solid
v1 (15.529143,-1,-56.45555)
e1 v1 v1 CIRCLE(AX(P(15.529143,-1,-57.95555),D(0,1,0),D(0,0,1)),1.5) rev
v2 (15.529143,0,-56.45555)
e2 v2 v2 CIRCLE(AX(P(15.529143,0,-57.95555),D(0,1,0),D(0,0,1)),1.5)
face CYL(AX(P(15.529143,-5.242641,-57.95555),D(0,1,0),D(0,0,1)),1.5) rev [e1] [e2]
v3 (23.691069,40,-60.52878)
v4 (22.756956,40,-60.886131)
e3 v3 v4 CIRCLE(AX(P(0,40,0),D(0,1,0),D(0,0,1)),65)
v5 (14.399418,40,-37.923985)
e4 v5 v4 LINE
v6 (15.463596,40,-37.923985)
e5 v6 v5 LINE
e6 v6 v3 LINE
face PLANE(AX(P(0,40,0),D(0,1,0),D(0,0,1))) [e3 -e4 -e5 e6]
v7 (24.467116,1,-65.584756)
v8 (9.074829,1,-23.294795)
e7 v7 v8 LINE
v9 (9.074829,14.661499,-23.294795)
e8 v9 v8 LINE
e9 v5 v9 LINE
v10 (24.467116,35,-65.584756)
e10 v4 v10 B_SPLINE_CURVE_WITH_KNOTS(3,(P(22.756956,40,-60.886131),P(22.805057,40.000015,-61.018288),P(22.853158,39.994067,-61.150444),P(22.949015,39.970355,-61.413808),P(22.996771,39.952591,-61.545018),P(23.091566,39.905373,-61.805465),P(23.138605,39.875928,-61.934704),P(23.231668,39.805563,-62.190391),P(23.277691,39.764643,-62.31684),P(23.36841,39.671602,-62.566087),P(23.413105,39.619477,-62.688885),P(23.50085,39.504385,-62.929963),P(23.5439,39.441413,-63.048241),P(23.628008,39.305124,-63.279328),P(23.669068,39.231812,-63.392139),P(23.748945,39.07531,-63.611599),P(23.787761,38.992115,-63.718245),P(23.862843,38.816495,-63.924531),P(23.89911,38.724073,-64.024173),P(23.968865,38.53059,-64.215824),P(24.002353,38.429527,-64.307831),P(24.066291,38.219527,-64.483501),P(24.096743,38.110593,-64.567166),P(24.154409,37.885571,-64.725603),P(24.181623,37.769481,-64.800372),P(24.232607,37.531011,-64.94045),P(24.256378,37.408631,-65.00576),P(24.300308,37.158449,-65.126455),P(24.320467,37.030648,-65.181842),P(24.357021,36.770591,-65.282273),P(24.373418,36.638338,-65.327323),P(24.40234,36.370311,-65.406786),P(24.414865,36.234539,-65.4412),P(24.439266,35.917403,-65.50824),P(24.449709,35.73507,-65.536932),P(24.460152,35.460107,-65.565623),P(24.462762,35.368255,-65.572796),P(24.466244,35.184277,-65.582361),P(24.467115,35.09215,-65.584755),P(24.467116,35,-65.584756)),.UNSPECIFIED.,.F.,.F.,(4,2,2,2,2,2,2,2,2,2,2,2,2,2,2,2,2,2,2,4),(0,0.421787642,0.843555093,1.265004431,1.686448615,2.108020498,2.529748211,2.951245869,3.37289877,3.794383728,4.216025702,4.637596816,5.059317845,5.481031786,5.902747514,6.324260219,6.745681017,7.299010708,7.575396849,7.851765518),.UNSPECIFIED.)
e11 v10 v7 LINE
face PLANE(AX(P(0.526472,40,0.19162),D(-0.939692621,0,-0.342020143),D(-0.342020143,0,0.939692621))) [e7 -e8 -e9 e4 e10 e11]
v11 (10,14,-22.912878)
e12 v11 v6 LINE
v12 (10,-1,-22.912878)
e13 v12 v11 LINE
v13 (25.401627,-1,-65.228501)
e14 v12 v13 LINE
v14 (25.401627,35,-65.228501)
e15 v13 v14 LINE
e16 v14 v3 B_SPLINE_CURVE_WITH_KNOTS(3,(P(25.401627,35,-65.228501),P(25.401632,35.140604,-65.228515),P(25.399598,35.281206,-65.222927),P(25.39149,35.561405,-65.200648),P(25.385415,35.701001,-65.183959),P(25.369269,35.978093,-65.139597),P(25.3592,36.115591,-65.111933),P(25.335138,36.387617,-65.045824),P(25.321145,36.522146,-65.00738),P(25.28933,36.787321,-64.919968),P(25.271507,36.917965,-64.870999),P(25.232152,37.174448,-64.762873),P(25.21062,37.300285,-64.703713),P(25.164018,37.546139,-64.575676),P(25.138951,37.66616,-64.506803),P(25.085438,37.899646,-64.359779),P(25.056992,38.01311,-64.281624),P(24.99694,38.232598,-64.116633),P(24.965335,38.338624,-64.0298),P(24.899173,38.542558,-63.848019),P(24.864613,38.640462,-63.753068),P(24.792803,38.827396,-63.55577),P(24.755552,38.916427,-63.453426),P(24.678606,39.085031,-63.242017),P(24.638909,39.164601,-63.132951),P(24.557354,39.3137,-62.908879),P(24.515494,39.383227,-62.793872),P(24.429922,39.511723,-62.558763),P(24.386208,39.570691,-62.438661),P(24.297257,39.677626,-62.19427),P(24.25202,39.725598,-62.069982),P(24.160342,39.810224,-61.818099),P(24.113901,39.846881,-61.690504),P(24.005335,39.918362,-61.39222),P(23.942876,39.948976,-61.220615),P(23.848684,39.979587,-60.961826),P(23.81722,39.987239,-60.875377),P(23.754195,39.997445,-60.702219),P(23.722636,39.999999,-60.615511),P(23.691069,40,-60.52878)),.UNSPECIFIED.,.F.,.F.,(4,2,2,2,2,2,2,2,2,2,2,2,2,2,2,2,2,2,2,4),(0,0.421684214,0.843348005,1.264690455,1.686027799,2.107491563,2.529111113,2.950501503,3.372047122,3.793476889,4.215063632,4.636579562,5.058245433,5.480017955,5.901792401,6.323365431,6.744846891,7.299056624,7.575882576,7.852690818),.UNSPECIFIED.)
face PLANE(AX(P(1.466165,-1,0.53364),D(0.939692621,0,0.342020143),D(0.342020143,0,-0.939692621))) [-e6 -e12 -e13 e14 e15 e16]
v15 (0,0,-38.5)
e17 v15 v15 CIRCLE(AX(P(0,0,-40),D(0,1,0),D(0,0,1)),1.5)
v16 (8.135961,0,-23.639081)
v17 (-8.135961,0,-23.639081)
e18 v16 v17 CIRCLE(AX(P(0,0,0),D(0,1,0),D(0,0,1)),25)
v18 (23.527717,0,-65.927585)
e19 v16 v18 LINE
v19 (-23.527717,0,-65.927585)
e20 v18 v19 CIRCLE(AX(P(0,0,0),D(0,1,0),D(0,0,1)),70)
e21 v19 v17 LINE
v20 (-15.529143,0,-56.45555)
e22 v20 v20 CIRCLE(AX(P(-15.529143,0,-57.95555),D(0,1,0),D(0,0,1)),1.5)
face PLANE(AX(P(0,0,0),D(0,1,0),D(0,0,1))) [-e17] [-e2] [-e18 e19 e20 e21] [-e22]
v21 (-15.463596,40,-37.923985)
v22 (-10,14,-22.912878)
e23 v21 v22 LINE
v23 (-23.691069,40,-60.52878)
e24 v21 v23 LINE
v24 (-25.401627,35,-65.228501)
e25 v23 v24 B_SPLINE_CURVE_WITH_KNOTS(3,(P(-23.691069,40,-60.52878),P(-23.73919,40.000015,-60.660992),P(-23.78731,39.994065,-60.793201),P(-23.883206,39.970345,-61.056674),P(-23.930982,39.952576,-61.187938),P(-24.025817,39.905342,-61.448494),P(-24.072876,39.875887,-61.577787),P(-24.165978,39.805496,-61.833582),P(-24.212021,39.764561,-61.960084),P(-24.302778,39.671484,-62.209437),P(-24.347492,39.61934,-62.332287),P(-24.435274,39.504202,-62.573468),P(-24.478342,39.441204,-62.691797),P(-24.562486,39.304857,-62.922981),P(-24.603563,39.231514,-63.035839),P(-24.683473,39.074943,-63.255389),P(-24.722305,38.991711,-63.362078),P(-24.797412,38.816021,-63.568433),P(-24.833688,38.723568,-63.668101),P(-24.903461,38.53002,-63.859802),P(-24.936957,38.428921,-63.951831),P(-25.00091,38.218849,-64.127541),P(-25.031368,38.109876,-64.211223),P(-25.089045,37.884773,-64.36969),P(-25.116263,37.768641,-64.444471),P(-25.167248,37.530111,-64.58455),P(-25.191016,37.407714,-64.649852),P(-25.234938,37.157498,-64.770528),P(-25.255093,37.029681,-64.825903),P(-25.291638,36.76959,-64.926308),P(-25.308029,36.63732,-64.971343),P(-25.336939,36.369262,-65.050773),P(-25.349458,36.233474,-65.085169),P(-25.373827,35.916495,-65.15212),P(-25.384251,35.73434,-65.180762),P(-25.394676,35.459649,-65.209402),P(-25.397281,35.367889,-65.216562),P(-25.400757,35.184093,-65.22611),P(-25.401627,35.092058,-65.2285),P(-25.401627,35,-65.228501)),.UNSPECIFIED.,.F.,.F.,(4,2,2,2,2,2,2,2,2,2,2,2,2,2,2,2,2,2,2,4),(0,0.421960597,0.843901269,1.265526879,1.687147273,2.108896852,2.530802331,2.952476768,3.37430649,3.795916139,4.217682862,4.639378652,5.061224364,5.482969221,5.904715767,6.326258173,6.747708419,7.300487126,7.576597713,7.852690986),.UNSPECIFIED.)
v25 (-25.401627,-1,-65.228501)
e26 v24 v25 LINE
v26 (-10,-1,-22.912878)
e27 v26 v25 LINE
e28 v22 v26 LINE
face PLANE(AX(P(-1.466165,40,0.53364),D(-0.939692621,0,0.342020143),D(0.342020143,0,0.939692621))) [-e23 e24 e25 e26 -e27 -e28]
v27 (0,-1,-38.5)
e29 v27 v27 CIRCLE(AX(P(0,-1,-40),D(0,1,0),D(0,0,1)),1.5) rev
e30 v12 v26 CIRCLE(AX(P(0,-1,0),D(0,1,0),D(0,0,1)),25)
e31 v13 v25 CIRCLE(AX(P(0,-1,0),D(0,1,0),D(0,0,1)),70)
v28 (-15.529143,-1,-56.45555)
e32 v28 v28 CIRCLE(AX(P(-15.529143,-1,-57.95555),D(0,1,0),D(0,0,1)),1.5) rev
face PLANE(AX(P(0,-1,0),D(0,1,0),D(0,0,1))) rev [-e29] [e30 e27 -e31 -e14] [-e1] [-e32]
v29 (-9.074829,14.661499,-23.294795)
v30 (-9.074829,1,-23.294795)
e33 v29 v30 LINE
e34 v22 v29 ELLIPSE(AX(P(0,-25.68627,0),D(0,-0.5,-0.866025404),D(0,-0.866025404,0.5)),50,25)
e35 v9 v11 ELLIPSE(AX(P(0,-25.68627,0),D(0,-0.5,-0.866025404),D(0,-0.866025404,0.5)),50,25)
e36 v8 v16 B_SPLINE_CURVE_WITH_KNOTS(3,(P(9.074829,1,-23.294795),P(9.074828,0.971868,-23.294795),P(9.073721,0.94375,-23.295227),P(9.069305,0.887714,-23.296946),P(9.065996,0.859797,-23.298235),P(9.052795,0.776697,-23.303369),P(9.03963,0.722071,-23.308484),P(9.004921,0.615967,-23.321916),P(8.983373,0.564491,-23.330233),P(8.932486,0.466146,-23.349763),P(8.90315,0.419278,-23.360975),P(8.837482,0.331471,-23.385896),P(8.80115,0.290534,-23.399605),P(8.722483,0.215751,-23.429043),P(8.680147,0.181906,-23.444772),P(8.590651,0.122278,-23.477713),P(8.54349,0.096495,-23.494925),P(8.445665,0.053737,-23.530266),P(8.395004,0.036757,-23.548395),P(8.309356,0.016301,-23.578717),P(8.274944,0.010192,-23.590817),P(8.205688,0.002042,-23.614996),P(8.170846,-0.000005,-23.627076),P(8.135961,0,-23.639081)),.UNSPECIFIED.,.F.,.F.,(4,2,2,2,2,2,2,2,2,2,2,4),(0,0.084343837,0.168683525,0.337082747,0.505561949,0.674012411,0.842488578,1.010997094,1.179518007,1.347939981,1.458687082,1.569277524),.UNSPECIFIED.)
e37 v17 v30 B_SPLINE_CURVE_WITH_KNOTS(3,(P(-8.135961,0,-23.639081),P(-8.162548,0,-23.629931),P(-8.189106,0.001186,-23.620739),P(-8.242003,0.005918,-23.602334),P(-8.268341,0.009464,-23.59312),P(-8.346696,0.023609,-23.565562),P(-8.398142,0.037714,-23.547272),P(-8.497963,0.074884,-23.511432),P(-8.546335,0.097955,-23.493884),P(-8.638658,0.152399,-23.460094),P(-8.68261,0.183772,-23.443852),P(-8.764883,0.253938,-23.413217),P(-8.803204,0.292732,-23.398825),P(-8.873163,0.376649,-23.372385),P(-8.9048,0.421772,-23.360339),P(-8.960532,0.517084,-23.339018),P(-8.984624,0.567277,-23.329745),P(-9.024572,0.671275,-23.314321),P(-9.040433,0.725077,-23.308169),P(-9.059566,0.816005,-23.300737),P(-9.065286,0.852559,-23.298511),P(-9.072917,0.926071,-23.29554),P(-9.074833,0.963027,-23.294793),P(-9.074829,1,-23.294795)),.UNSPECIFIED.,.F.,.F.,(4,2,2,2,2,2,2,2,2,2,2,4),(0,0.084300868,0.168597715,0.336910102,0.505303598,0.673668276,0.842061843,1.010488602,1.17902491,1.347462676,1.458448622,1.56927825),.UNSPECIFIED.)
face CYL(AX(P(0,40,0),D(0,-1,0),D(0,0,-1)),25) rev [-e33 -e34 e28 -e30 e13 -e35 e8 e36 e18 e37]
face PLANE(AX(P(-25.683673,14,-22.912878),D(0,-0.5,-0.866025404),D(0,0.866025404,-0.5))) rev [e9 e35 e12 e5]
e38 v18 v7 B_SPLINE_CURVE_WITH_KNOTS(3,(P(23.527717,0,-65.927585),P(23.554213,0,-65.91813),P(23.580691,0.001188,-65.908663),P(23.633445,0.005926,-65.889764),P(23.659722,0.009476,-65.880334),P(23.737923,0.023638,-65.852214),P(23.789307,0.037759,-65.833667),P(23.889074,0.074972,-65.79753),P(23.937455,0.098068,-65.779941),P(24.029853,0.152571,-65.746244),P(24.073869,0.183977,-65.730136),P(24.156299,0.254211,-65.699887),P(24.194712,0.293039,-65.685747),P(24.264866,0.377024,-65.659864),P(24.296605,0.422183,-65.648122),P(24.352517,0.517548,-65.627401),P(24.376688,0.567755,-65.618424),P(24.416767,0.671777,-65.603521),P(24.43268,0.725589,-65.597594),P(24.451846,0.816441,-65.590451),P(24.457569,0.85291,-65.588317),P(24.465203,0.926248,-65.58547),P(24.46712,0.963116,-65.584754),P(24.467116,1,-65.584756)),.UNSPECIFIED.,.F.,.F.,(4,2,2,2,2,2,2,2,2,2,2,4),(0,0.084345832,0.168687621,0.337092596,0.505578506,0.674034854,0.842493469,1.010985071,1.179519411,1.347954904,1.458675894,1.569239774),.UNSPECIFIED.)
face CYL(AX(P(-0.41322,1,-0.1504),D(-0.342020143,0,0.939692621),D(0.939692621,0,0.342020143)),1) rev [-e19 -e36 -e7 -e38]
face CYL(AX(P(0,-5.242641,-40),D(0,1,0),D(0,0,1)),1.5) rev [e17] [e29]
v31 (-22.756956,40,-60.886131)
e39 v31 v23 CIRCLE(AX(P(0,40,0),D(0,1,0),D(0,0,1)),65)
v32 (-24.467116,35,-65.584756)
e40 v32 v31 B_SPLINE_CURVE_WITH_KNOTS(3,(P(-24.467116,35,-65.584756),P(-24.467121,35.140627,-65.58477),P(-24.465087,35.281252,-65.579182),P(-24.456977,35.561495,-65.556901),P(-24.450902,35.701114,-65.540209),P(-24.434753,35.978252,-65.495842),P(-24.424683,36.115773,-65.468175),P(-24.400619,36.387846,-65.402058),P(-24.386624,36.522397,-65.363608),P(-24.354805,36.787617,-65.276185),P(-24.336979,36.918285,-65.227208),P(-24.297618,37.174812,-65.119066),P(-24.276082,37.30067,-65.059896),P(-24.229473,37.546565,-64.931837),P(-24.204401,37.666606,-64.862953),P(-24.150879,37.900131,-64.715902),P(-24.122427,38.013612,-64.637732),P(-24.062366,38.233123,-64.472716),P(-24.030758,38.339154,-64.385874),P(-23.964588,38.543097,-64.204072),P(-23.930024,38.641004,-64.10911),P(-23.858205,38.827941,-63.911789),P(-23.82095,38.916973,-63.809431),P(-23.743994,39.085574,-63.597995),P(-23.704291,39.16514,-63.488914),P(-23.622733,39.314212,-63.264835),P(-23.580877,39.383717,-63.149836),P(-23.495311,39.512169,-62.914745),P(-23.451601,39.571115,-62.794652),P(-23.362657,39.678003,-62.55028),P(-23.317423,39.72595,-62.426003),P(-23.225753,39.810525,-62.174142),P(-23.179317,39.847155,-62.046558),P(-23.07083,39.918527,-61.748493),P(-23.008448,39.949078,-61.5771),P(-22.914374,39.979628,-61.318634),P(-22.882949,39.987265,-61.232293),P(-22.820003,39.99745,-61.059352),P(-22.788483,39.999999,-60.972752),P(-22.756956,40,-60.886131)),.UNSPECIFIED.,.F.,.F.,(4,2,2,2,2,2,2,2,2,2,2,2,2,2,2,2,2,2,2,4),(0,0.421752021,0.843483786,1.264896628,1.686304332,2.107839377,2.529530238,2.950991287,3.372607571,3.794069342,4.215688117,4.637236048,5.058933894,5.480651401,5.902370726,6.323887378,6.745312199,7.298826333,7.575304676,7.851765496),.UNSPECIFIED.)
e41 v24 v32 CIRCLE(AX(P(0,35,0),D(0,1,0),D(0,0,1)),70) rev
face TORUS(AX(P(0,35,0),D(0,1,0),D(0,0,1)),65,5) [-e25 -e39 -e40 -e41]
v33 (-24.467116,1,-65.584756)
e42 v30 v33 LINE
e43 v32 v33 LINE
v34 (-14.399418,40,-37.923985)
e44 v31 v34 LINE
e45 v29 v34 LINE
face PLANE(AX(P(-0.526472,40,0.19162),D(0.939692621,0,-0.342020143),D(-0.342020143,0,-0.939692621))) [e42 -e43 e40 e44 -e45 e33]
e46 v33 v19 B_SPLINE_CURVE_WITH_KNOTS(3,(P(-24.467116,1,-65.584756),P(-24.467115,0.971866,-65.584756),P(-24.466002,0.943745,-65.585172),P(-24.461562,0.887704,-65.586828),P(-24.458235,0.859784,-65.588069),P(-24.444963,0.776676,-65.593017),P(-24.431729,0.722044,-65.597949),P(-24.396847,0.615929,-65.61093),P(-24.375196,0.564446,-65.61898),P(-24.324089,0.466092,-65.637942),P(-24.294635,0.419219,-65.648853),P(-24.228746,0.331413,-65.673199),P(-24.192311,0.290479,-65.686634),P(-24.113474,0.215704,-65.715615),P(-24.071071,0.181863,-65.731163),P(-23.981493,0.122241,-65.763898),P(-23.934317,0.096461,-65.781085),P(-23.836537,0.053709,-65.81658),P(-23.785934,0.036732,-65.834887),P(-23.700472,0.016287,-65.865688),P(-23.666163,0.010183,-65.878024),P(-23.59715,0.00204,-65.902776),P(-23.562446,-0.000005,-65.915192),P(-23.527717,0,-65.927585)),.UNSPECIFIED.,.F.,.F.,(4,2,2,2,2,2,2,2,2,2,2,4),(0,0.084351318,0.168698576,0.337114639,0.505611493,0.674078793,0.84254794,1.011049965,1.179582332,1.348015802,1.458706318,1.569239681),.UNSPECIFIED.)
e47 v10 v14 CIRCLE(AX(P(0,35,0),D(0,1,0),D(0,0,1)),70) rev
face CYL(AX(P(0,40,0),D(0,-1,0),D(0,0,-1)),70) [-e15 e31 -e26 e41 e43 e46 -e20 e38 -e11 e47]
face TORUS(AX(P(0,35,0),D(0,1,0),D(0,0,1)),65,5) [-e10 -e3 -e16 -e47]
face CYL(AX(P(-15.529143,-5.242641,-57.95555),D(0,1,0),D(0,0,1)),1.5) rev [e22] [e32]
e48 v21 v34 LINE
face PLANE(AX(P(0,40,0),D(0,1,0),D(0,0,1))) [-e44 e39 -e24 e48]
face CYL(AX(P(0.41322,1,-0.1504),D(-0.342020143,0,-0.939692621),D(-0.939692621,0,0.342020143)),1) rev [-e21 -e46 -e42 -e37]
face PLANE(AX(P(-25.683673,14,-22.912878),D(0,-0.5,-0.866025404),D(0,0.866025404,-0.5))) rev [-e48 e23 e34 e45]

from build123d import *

# Parameters (mm, degrees)
BOSS_EXTRUDE2_DEPTH     = 40
BOSS_EXTRUDE2_2_DEPTH   = 40
BOSS_EXTRUDE3_START     = -1
BOSS_EXTRUDE3_DEPTH     = 1
FILLET1_R               = 1
FILLET2_R               = 5
CUT_EXTRUDE1_DEPTH      = 85.5295373443375
CUT_EXTRUDE1_DEPTH_BACK = 85.5295373443375
SKETCH4_R               = 1.5000000000000004
SKETCH4_R_2             = 1.5000000000000009
SKETCH4_R_3             = 1.4999999999999991
CUT_EXTRUDE2_DEPTH      = 1


with BuildPart() as part:
    # Sketch1 → Boss-Extrude2 (new body)
    with BuildSketch(Plane(origin=(0, 0, 0), x_dir=(1, 0, 0), z_dir=(0, 1, 0))):
        with BuildLine():
            Line((-25.401627045652027, 65.22850100556965), (-10, 22.912878474779202))
            ThreePointArc((-10.000000000000004, 22.912878474779205), (-9.53932578125167, 23.108467358073476), (-9.0748285709005, 23.294795264366854))
            Line((-9.074828570900502, 23.294795264366854), (-24.46711558509191, 65.58475626962223))
            ThreePointArc((-24.46711558509193, 65.58475626962225), (-24.935007566594734, 65.40829762082075), (-25.401627045652038, 65.22850100556964))
        make_face()
    extrude(amount=BOSS_EXTRUDE2_DEPTH)



with BuildPart() as body_2:
    # Sketch1 → Boss-Extrude2 2 (new body)
    with BuildSketch(Plane(origin=(0, 0, 0), x_dir=(1, 0, 0), z_dir=(0, 1, 0))):
        with BuildLine():
            Line((24.46711558509189, 65.58475626962225), (9.074828570900499, 23.294795264366847))
            ThreePointArc((9.0748285709005, 23.294795264366854), (9.53932578125167, 23.108467358073483), (10, 22.912878474779205))
            Line((10, 22.912878474779205), (25.401627045652017, 65.22850100556967))
            ThreePointArc((25.401627045652017, 65.22850100556967), (24.935007566594702, 65.40829762082078), (24.467115585091896, 65.58475626962228))
        make_face()
    extrude(amount=BOSS_EXTRUDE2_2_DEPTH)


with BuildPart() as part_1:
    add(part.part)

    add(body_2.part)  # Boss-Extrude3 merges body 2
    # Sketch1<5> → Boss-Extrude3 (add)
    with BuildSketch(Plane(origin=(0, 0, 0), x_dir=(1, 0, 0), z_dir=(0, 1, 0)).offset(BOSS_EXTRUDE3_START)):
        with BuildLine():
            Line((-25.401627045652027, 65.22850100556965), (-10, 22.912878474779202))
            ThreePointArc((-10, 22.912878474779205), (-8.9e-16, 25), (9.999999999999996, 22.912878474779205))
            Line((10, 22.912878474779205), (25.401627045652017, 65.22850100556967))
            ThreePointArc((25.401627045652017, 65.22850100556967), (-1.421e-14, 70.00000000000003), (-25.401627045652038, 65.22850100556964))
        make_face()
    extrude(amount=BOSS_EXTRUDE3_DEPTH)

    # Fillet1
    fillet1_edges = [part_1.edges().sort_by_distance(p)[0] for p in [
        (16.770972077996195, 0, -44.43977576699454),
        (-16.770972077996205, 0, -44.43977576699454),
    ]]
    fillet(fillet1_edges, radius=FILLET1_R)

    # Fillet2
    # the kernel refuses this fillet: 5 mm, written as the material it takes off along each edge
    with BuildSketch(Plane(origin=(4.656364e-11, 40, 1.1895196e-10), x_dir=(-0.1775518542225804, 0, -0.9841114464643339), z_dir=(0.9841114464643339, 0, -0.1775518542225804))) as fillet2_piece_1:
        with BuildLine():
            CenterArc((70.00000000012774 - FILLET2_R, -FILLET2_R), FILLET2_R, 0, 90)
            Line((70.00000000012774 - FILLET2_R, 0), (70.00000000012774, 0))
            Line((70.00000000012774, 0), (70.00000000012774, -FILLET2_R))
        make_face()
    revolve(axis=Axis((4.656364e-11, 40, 1.1895196e-10), (0, 1, 0)), revolution_arc=21.281391087786062, mode=Mode.SUBTRACT)
    with BuildSketch(Plane(origin=(-2.019185e-11, 40, 5.042011e-11), x_dir=(0.5226263256133499, 0, -0.8525618592078166), z_dir=(0.8525618592078166, 0, 0.5226263256133499))) as fillet2_piece_2:
        with BuildLine():
            CenterArc((70.00000000010422 - FILLET2_R, -FILLET2_R), FILLET2_R, 0, 89.99999999999983)
            Line((70.00000000010422 - FILLET2_R, 0), (70.00000000010422, 0))
            Line((70.00000000010422, 0), (70.00000000010421, -FILLET2_R))
        make_face()
    revolve(axis=Axis((-2.019185e-11, 40, 5.042011e-11), (0, 1, 0)), revolution_arc=21.281391087808515, mode=Mode.SUBTRACT)

    # Sketch3 → Cut-Extrude1 (cut, two sides: drawn at the far end of the back side and taken through both)
    with BuildSketch(Plane(origin=(0, 0, 0), x_dir=(0, 0, -1), z_dir=(1, 0, 0)).offset(-CUT_EXTRUDE1_DEPTH_BACK)):
        Polygon((22.912878474779205, 13.999999999999998), (37.92398547370926, 40), (22.912878474779205, 40), (17.723420287047986, 40), (17.723420287047986, 13.999999999999998), align=None)
    extrude(amount=CUT_EXTRUDE1_DEPTH + CUT_EXTRUDE1_DEPTH_BACK, mode=Mode.SUBTRACT)

    # Sketch4 → Cut-Extrude2 (cut)
    with BuildSketch(Plane(origin=(0, 0, 0), x_dir=(1, 0, 0), z_dir=(0, 1, 0))):
        with Locations(Location((2.4e-16, 40, 0), (0, 0, 270))):
            Circle(SKETCH4_R)
        with Locations(Location((-15.529142706151296, 57.95554957734408, 0), (0, 0, 270))):
            Circle(SKETCH4_R_2)
        with Locations(Location((15.529142706151275, 57.955549577344094, 0), (0, 0, 270))):
            Circle(SKETCH4_R_3)
    extrude(amount=-CUT_EXTRUDE2_DEPTH, mode=Mode.SUBTRACT)


solid = part_1.part
